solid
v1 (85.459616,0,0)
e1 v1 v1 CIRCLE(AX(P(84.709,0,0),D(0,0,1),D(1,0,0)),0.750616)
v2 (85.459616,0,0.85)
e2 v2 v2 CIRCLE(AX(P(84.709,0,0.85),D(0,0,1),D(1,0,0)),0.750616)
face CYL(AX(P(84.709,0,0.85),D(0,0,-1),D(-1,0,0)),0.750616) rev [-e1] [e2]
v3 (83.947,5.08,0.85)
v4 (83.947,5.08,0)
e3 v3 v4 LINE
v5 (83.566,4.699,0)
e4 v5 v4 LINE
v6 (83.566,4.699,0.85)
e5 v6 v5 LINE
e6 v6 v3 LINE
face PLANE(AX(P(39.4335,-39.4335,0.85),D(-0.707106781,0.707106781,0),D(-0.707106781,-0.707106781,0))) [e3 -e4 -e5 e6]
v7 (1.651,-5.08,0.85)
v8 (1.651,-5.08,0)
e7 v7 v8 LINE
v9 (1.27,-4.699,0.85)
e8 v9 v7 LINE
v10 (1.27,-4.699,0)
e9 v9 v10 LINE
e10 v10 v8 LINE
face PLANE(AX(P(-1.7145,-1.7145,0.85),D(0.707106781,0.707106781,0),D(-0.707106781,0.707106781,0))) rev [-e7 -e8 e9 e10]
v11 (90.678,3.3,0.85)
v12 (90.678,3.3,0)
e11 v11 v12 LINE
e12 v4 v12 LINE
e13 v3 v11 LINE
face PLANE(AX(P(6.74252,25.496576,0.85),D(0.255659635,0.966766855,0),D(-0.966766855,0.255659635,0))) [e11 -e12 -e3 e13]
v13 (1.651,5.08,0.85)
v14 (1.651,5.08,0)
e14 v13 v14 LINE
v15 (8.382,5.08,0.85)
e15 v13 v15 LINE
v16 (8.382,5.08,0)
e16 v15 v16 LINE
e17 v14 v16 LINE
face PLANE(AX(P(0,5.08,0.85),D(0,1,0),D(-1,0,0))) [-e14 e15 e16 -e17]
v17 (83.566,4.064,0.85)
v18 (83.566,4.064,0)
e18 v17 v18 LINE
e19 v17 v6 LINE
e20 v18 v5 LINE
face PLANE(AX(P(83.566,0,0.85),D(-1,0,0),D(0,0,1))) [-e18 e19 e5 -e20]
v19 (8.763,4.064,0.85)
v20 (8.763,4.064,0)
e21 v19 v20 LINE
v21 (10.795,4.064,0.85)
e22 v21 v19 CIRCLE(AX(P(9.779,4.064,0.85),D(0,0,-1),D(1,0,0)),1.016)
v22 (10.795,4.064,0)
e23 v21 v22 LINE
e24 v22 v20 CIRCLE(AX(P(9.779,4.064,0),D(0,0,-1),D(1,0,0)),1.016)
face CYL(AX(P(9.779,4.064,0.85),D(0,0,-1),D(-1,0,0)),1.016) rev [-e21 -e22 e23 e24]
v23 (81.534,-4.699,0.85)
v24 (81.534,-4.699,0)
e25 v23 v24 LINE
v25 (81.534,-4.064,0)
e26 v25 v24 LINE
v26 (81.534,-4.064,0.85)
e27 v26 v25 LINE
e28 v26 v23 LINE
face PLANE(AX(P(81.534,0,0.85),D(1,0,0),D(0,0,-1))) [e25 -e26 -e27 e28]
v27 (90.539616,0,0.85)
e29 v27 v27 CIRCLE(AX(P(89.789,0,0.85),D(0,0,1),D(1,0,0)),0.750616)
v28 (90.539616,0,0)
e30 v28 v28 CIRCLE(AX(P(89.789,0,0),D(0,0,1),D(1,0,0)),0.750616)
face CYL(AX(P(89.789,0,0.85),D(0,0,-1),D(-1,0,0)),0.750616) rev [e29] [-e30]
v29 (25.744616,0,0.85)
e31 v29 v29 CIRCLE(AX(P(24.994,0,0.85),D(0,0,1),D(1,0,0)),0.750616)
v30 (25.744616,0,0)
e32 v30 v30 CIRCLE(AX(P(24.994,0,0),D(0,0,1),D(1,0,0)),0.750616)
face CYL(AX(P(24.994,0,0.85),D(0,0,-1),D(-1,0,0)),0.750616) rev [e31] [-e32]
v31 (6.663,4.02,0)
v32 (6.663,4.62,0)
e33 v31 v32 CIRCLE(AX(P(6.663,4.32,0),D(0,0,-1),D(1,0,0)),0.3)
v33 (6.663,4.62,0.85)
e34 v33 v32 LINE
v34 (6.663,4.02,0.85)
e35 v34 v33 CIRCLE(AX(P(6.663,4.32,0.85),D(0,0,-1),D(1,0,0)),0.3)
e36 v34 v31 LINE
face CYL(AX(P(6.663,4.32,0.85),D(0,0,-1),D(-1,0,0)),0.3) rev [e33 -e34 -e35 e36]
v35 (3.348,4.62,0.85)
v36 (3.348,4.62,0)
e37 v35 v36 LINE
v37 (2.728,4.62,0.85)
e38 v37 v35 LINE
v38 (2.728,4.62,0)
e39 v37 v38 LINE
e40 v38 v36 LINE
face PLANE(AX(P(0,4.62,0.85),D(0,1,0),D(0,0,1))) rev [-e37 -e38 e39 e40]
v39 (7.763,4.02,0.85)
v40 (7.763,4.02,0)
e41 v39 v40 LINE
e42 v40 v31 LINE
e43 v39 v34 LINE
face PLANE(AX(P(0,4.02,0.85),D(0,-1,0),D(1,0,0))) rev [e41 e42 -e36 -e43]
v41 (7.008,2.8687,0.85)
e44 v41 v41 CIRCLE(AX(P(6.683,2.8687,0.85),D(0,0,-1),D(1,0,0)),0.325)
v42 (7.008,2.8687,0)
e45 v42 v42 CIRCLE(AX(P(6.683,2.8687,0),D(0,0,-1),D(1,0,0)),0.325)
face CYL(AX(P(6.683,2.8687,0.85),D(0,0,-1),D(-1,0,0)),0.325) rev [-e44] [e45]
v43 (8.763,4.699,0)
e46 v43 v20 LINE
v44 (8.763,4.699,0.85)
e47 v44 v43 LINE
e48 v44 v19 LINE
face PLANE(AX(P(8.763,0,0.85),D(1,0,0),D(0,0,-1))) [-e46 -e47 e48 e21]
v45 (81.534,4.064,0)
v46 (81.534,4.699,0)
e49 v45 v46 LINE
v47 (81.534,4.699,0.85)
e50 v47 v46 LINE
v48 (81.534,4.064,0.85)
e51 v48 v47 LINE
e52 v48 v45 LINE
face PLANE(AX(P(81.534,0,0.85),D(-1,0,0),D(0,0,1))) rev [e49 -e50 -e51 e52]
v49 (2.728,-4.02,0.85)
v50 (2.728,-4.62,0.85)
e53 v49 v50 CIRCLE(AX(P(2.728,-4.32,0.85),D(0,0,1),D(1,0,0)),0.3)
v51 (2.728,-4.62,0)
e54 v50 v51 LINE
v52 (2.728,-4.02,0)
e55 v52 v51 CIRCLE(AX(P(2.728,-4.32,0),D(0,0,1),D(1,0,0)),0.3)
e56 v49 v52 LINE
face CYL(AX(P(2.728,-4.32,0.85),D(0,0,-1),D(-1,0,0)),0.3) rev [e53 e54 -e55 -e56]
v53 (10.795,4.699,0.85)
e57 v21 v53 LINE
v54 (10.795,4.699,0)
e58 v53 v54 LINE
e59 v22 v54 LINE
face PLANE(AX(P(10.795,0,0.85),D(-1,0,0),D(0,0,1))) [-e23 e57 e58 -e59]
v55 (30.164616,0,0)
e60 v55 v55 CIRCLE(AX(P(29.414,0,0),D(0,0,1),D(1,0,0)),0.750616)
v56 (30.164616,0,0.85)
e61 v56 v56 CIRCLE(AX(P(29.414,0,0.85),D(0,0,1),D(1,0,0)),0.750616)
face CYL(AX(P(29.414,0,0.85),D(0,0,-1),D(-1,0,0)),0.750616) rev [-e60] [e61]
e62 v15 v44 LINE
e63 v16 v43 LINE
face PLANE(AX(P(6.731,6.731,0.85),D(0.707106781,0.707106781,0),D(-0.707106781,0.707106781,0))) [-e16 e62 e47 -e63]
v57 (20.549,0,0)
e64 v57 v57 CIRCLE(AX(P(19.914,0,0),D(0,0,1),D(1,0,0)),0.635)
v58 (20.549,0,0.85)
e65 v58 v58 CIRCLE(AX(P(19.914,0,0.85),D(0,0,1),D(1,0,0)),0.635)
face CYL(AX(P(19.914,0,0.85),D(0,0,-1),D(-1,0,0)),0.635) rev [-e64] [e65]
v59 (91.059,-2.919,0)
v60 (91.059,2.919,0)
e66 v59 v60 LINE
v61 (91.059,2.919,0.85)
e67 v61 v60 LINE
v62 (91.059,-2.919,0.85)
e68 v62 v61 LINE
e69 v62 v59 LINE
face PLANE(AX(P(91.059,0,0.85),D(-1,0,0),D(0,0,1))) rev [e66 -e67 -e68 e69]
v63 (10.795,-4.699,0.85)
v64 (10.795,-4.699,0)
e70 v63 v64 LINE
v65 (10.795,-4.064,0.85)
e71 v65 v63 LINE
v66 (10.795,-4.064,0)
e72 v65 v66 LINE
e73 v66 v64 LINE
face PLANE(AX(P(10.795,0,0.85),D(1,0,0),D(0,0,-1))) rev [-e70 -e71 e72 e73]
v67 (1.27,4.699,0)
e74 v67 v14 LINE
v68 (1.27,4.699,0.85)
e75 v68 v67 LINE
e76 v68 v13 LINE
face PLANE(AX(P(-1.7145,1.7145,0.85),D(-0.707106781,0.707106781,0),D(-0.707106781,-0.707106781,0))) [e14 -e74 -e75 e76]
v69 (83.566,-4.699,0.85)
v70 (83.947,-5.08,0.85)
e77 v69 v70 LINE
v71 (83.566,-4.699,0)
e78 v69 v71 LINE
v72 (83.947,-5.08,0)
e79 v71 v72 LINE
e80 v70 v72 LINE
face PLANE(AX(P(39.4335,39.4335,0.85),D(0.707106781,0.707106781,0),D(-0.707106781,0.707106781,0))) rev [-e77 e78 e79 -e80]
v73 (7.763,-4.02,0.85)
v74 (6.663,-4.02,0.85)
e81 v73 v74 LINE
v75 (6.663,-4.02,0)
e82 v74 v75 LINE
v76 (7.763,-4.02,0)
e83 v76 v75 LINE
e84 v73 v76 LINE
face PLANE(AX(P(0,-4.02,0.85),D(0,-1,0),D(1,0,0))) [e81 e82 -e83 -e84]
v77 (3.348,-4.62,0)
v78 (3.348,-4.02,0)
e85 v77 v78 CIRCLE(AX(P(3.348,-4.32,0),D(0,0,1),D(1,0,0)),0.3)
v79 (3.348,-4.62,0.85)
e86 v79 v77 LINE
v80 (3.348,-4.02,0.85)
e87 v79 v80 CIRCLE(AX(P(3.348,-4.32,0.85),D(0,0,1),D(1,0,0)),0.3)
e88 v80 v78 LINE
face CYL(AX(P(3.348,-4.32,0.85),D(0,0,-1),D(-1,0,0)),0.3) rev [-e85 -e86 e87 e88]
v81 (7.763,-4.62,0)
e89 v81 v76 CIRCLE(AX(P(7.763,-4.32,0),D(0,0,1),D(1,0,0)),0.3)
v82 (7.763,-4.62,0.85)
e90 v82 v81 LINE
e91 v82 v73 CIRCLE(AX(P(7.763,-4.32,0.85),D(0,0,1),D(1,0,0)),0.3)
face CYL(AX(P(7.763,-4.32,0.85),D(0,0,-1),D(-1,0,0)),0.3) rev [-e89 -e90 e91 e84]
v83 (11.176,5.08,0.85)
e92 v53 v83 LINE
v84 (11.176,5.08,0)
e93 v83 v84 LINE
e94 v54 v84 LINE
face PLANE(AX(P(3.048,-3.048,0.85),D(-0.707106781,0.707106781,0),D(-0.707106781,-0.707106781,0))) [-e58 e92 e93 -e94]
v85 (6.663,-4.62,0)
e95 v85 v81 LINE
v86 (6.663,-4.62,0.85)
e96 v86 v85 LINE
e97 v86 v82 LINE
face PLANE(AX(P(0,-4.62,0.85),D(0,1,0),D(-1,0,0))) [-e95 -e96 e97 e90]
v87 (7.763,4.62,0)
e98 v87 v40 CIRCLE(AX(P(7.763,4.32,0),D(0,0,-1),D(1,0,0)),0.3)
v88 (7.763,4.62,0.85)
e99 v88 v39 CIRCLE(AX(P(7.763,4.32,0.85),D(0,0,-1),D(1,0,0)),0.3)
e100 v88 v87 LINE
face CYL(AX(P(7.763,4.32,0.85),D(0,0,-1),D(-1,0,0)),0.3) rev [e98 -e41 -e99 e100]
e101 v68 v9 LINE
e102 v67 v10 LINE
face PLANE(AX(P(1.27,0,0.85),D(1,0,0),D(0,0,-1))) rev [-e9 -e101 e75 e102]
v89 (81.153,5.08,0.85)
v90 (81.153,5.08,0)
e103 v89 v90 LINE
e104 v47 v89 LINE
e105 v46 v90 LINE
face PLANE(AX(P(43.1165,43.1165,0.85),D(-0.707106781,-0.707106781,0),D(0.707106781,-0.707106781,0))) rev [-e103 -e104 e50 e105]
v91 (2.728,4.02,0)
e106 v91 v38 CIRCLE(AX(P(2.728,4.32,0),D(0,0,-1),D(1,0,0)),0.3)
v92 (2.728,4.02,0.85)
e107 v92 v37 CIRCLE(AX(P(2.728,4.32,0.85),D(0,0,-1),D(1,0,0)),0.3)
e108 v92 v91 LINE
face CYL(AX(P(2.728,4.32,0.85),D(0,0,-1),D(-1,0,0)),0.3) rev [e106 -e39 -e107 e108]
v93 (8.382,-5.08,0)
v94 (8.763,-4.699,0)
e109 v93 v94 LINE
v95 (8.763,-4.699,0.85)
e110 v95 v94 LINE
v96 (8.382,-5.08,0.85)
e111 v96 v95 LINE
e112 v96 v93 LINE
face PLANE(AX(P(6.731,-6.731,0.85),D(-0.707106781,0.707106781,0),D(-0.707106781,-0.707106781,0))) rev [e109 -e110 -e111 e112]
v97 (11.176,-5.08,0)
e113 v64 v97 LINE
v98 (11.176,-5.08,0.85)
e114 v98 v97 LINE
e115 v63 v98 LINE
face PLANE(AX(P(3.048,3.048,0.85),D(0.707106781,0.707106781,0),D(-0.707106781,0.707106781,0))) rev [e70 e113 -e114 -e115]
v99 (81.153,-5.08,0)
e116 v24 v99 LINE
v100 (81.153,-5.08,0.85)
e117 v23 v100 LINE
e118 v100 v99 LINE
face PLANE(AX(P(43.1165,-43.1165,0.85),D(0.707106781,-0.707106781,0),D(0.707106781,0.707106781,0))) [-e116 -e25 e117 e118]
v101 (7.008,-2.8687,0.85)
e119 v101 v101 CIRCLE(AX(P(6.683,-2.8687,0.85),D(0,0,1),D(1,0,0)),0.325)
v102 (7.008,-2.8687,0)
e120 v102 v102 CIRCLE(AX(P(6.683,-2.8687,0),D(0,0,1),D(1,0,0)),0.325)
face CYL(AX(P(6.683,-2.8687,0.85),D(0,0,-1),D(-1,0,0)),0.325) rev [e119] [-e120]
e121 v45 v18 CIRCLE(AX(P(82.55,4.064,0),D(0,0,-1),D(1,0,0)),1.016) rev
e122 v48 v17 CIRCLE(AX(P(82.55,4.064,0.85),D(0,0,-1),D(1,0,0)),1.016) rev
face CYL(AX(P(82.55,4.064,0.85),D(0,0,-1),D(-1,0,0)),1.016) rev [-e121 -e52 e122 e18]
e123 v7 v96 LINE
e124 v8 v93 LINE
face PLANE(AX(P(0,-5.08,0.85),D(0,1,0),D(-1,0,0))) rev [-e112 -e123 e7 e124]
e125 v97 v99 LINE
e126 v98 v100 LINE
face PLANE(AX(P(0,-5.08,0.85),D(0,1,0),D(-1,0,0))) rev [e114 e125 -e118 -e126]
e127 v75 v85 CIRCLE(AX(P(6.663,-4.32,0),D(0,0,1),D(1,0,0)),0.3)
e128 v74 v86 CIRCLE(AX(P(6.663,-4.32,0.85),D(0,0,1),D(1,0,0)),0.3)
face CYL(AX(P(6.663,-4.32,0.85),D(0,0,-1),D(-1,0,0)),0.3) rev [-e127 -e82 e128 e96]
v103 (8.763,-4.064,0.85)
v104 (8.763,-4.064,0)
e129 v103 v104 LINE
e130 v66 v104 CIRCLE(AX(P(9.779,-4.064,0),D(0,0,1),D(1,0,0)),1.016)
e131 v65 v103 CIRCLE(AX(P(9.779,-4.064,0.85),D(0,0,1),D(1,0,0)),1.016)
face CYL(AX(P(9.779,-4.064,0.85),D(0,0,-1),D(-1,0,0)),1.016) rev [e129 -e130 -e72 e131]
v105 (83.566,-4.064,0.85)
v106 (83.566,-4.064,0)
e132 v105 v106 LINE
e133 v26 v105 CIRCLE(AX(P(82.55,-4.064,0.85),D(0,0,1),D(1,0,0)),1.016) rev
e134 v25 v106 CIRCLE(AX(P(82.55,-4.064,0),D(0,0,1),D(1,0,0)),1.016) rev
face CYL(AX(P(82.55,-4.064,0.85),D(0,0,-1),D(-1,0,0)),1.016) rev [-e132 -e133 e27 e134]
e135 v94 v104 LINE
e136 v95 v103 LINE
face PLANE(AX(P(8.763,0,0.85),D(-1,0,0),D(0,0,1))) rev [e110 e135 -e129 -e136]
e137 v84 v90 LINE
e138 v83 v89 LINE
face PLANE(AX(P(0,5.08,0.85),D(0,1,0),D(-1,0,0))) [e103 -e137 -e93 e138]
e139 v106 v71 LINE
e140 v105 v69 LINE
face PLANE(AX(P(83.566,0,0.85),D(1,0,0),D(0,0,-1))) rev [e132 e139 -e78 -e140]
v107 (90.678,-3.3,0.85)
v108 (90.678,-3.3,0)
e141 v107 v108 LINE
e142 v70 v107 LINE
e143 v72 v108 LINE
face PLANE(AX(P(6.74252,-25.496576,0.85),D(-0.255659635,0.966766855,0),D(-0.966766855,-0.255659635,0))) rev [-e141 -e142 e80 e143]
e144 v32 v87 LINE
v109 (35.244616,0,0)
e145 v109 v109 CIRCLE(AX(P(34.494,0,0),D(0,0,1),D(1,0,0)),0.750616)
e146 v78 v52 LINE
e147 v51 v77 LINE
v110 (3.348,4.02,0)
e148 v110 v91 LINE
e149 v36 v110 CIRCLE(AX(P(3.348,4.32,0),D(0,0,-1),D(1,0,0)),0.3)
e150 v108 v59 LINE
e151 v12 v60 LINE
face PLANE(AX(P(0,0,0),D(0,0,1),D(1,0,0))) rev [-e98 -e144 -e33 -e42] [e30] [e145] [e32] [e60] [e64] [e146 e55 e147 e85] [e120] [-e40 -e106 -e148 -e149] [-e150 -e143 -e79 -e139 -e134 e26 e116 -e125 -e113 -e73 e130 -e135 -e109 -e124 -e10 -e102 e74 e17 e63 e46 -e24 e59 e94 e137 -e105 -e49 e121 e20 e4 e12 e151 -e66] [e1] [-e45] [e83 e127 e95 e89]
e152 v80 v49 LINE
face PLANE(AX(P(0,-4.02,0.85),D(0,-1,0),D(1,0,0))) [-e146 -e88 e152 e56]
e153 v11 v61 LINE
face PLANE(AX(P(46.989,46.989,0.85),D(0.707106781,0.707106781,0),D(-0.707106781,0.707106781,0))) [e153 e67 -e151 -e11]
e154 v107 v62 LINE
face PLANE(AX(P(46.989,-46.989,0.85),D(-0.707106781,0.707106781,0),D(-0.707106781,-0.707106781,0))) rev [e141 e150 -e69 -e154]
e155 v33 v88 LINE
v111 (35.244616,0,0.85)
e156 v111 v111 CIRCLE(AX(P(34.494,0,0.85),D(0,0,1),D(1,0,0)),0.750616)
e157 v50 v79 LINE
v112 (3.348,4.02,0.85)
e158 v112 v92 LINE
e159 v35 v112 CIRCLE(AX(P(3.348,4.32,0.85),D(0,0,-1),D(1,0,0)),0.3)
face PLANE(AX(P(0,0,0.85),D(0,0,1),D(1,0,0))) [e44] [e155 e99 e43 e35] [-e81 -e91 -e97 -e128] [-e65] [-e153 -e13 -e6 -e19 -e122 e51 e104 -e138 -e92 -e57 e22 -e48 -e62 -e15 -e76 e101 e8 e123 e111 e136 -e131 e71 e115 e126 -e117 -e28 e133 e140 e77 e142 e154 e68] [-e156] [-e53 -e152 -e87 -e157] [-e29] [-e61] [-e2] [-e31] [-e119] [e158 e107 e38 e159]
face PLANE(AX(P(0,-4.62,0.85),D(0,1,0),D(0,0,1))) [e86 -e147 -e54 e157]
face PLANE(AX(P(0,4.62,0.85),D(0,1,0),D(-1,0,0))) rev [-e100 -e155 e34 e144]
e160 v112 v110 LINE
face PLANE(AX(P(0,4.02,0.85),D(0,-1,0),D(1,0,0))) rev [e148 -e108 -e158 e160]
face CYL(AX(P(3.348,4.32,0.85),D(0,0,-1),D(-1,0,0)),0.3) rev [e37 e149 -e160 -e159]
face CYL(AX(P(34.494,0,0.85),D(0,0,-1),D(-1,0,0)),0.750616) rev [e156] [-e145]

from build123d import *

# Parameters (mm, degrees)
EXTRUDE_1_OUTLINE_R = 0.325
EXTRUDE_1_DEPTH     = 0.85
SKETCH_1_R          = 0.635
SKETCH_1_R_2        = 0.750616105
CUT_EXTRUDE_1_DEPTH = 92.204552414


# Read off the part's stored shape, not the designer's step: 凸台-拉伸1
with BuildPart() as part:
    # 凸台-拉伸1 outline → 凸台-拉伸1 (new body)
    with BuildSketch(Plane.XY):
        with BuildLine():
            Line((81.153, -5.08), (81.534, -4.699))
            Line((81.534, -4.699), (81.534, -4.064))
            ThreePointArc((81.534, -4.064), (82.55, -3.048), (83.566, -4.064))
            Line((83.566, -4.064), (83.566, -4.699))
            Line((83.566, -4.699), (83.947, -5.08))
            Line((83.947, -5.08), (90.678, -3.3))
            Line((90.678, -3.3), (91.059, -2.919))
            Line((91.059, -2.919), (91.059, 0))
            Line((91.059, 0), (1.27, 0))
            Line((1.27, 0), (1.27, -4.699))
            Line((1.27, -4.699), (1.651, -5.08))
            Line((1.651, -5.08), (8.382, -5.08))
            Line((8.382, -5.08), (8.763, -4.699))
            Line((8.763, -4.699), (8.763, -4.064))
            ThreePointArc((8.763, -4.064), (9.779, -3.048), (10.795, -4.064))
            Line((10.795, -4.064), (10.795, -4.699))
            Line((10.795, -4.699), (11.176, -5.08))
            Line((11.176, -5.08), (81.153, -5.08))
        make_face()
        with BuildLine():
            Line((2.728, -4.02), (3.348, -4.02))
            ThreePointArc((3.348, -4.02), (3.648, -4.32), (3.348, -4.62))
            Line((3.348, -4.62), (2.728, -4.62))
            ThreePointArc((2.728, -4.62), (2.428, -4.32), (2.728, -4.02))
        make_face(mode=Mode.SUBTRACT)
        with BuildLine():
            Line((7.763, -4.62), (6.663, -4.62))
            ThreePointArc((6.663, -4.62), (6.363, -4.32), (6.663, -4.02))
            Line((6.663, -4.02), (7.763, -4.02))
            ThreePointArc((7.763, -4.02), (8.063, -4.32), (7.763, -4.62))
        make_face(mode=Mode.SUBTRACT)
        with Locations((6.683, -2.8687)):
            Circle(EXTRUDE_1_OUTLINE_R, mode=Mode.SUBTRACT)
    extrude_1 = extrude(amount=EXTRUDE_1_DEPTH)

    # 镜向1: 凸台-拉伸1 across plane
    add(extrude_1.mirror(Plane(origin=(0, 0, 0.85), x_dir=(0, 0, 1), z_dir=(0, 1, 0))))

    # 草图1 → 切除-拉伸1 (cut, through all)
    with BuildSketch(Plane.XY):
        with Locations((19.914, 0)):
            Circle(SKETCH_1_R)
        with Locations((24.994, 0)):
            Circle(SKETCH_1_R_2)
        with Locations((29.414, 0)):
            Circle(SKETCH_1_R_2)
        with Locations((34.494, 0)):
            Circle(SKETCH_1_R_2)
        with Locations((89.789, 0)):
            Circle(SKETCH_1_R_2)
        with Locations((84.709, 0)):
            Circle(SKETCH_1_R_2)
    extrude(amount=CUT_EXTRUDE_1_DEPTH, mode=Mode.SUBTRACT)


solid = part.part
